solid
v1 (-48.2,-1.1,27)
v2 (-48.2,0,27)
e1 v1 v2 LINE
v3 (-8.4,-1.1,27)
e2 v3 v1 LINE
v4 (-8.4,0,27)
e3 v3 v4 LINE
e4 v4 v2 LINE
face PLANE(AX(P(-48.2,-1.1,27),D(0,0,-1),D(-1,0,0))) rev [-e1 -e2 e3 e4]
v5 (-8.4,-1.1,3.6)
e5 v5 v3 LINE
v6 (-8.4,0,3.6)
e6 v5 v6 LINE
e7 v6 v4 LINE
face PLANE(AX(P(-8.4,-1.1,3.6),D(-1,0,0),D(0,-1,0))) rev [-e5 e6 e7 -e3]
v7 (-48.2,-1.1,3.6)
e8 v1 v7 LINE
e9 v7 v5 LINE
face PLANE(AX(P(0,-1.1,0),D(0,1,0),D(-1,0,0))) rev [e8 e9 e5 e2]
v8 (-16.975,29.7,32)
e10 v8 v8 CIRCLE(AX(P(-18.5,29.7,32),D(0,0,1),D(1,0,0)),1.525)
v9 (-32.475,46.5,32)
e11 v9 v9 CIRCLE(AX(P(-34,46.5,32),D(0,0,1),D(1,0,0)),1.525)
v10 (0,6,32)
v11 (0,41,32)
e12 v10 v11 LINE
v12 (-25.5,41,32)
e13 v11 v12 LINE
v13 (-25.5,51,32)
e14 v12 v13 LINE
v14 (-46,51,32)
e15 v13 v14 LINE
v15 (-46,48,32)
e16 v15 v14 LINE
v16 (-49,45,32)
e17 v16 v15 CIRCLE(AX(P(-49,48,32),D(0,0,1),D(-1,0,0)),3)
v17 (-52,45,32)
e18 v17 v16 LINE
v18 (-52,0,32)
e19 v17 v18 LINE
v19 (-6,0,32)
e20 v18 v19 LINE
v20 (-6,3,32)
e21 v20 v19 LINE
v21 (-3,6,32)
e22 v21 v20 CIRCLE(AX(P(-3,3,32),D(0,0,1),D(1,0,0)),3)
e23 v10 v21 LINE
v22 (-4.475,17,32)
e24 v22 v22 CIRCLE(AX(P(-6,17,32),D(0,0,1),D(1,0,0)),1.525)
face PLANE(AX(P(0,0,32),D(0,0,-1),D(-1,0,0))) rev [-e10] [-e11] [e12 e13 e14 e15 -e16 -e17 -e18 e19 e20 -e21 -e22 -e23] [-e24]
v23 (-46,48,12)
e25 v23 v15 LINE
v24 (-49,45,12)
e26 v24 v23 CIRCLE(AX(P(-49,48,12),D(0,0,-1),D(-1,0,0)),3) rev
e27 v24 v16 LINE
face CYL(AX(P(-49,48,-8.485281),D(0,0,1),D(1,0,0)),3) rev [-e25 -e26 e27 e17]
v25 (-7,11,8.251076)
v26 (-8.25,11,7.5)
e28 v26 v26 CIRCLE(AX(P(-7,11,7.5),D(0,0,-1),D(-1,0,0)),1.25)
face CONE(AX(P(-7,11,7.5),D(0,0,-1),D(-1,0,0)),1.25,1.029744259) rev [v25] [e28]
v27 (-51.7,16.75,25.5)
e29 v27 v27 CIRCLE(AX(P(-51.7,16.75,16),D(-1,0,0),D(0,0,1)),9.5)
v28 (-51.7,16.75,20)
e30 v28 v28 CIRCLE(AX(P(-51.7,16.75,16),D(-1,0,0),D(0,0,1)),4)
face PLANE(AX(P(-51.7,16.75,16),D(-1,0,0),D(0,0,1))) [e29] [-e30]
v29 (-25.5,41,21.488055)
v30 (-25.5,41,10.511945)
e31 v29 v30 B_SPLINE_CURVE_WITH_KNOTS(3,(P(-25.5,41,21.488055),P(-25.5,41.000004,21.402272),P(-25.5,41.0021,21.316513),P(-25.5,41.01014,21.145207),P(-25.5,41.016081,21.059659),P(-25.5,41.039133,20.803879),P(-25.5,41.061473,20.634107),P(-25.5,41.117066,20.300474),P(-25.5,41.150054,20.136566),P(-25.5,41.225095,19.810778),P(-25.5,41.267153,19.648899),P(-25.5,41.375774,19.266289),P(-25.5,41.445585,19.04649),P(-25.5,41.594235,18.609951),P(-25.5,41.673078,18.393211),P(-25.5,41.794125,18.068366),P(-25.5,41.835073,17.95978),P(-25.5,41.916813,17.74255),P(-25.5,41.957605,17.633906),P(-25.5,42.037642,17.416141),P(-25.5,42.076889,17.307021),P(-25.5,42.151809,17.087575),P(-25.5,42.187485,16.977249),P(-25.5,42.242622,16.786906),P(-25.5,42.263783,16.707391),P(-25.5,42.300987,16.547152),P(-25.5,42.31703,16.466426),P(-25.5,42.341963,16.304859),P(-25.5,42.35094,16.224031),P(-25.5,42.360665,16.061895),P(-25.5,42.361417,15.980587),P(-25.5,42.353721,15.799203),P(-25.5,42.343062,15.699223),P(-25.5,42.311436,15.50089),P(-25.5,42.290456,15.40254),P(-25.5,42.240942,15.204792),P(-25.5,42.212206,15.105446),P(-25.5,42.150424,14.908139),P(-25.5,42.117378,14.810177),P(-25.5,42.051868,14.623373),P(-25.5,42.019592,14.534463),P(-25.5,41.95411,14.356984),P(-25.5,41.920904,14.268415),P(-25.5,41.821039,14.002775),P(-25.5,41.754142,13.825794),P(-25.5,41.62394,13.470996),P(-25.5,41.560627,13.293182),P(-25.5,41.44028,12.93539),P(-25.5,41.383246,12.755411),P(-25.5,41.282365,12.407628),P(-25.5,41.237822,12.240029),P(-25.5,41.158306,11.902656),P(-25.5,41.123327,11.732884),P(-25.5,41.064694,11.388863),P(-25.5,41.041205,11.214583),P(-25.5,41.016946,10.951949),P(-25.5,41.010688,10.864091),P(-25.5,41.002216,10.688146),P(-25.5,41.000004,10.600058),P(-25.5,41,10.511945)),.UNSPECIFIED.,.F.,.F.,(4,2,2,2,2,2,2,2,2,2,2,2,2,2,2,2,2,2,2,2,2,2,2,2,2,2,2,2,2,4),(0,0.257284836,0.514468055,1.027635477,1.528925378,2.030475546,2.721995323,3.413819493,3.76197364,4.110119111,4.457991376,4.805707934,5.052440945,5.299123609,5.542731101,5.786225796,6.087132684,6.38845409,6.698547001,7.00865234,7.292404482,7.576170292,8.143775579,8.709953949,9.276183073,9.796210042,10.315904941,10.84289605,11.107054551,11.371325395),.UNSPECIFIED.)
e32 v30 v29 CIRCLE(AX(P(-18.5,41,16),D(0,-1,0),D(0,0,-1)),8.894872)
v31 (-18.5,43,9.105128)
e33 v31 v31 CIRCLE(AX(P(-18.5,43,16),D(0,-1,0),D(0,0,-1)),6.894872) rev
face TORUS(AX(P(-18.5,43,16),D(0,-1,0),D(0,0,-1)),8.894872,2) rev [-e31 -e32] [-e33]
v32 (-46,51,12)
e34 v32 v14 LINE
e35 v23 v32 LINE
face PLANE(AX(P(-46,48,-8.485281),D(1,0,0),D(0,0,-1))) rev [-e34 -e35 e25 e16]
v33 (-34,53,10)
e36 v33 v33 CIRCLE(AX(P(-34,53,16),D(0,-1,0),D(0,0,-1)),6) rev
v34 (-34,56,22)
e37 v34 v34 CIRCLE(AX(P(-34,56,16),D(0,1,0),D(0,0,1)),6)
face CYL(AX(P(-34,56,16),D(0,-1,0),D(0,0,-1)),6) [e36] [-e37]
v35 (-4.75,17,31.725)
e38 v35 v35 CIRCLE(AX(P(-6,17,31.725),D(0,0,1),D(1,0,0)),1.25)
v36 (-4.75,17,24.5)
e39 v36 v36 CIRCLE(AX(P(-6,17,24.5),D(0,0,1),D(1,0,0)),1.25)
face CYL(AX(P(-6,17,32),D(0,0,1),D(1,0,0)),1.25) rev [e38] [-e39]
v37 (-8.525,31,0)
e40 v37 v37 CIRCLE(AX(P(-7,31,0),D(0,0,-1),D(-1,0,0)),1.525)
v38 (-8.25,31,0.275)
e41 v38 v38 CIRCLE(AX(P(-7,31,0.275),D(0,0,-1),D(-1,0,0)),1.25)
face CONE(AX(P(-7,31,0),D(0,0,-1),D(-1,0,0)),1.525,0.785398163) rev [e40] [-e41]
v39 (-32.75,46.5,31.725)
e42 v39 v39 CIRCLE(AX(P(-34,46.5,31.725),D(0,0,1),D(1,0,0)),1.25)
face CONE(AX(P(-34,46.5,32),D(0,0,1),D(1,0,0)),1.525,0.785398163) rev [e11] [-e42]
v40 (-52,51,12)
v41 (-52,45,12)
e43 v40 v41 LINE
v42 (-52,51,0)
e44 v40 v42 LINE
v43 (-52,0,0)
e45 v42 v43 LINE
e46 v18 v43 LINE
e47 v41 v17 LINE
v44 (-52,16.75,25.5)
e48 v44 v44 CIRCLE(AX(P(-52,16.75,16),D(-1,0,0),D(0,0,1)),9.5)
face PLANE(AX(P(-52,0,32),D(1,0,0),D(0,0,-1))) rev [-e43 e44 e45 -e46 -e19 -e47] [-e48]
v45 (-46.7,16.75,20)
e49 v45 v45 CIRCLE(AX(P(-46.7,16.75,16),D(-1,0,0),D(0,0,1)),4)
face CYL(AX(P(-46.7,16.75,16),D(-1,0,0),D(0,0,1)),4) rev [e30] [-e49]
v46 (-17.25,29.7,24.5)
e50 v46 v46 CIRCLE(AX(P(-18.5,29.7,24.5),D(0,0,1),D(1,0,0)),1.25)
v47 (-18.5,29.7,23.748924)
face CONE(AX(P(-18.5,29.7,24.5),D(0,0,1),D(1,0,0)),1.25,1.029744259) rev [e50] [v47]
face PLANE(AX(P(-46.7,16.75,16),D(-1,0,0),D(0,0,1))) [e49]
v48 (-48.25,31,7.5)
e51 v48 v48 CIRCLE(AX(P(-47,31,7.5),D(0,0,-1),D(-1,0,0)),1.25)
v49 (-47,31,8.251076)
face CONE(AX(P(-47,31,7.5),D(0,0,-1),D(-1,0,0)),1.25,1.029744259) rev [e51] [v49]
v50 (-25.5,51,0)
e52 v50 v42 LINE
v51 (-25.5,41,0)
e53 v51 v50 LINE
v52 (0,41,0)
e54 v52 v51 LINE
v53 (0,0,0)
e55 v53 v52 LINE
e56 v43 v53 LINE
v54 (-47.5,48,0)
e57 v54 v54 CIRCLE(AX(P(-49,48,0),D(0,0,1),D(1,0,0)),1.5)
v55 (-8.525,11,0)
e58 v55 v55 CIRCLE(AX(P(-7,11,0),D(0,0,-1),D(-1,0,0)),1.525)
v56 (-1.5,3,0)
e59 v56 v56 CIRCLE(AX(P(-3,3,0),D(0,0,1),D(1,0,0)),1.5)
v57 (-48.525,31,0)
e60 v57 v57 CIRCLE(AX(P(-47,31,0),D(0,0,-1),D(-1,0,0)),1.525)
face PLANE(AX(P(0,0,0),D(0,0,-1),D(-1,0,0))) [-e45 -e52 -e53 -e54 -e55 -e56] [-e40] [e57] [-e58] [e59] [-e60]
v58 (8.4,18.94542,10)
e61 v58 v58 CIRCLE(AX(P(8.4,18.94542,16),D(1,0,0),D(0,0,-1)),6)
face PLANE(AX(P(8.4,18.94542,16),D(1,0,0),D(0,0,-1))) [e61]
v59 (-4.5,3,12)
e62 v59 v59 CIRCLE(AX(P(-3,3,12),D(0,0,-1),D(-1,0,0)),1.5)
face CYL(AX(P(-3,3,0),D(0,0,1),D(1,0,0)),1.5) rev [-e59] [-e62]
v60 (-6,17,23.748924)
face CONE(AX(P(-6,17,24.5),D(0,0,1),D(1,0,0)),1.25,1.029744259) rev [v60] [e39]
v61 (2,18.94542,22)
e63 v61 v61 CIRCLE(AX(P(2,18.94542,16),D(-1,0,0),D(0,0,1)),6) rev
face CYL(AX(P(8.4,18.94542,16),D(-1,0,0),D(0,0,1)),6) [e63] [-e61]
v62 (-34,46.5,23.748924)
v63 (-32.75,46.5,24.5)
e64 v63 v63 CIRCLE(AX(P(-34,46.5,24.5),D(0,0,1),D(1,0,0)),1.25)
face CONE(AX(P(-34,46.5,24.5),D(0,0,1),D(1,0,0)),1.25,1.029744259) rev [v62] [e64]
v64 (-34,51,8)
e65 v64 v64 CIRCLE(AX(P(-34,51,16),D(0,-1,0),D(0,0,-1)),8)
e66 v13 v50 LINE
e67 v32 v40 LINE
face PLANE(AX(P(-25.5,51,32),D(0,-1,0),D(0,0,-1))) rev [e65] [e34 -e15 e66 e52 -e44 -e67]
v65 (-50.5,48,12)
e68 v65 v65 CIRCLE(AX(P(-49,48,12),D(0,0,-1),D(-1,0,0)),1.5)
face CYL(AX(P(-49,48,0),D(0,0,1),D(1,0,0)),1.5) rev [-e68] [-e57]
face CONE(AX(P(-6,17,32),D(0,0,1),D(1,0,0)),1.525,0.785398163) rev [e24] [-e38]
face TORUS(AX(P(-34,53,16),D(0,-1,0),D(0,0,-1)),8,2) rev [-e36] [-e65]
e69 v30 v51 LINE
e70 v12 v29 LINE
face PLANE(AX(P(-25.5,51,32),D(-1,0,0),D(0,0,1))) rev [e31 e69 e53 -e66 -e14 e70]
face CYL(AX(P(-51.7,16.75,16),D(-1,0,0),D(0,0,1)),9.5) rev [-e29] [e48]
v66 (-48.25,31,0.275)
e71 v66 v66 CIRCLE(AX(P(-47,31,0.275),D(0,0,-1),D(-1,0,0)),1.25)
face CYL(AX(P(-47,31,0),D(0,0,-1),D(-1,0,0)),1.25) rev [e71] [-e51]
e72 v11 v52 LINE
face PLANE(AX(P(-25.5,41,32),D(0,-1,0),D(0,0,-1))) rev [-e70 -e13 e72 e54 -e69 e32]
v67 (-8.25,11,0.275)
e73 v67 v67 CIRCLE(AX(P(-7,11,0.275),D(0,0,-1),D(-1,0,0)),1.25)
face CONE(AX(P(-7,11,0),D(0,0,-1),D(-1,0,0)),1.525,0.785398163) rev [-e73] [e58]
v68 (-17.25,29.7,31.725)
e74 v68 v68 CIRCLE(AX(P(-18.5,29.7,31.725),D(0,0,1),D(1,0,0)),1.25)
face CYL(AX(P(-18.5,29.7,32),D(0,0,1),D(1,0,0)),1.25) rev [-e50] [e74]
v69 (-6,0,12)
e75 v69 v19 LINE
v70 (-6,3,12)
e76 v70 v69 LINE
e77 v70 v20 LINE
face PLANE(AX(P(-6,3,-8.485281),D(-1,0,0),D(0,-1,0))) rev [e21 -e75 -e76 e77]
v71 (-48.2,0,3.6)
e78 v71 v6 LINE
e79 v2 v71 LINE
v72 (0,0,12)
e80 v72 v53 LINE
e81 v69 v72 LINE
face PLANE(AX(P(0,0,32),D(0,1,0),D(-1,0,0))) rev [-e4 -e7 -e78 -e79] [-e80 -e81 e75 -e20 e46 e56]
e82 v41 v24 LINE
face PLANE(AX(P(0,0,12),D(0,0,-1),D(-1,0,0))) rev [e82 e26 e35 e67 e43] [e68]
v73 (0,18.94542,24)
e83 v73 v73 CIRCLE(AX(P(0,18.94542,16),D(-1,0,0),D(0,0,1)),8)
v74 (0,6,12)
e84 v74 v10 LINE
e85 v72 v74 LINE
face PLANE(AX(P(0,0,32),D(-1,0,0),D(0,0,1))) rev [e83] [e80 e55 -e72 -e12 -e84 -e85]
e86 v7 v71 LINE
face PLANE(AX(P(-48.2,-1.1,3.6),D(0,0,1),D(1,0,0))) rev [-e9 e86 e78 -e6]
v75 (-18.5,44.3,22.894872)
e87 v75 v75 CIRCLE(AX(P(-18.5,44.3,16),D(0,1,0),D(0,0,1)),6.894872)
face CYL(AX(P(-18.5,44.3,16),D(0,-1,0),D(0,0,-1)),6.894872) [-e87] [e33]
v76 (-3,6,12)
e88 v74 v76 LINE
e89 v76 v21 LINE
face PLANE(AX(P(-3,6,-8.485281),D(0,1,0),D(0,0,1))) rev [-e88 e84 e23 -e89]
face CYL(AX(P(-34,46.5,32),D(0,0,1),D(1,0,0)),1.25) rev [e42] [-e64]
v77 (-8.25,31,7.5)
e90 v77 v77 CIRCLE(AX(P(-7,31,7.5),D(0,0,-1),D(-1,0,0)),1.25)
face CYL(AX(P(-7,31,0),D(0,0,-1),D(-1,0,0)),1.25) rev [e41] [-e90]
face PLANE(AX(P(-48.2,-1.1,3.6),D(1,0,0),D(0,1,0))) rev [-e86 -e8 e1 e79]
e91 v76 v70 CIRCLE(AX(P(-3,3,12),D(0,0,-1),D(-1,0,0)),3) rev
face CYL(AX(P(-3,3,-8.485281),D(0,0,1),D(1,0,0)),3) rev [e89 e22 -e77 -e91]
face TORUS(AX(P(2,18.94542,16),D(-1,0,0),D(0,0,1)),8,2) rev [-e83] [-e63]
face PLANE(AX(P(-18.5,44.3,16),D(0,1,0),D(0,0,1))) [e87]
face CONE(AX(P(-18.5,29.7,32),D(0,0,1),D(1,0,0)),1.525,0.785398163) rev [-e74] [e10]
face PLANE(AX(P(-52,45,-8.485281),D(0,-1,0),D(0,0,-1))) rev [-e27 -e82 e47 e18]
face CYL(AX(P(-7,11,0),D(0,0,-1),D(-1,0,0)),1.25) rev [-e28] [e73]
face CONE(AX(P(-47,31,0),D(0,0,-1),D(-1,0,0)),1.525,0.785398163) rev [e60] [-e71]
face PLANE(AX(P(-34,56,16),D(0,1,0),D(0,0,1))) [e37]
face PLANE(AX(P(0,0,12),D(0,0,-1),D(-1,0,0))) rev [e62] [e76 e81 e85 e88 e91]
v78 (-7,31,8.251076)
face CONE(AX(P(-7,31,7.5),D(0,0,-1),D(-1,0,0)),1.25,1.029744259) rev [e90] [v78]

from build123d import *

# Parameters (mm, degrees)
BOSS_EXTRUDE1_DEPTH         = 32
SKETCH2_R                   = 9.5
CUT_EXTRUDE1_DEPTH          = 0.3
SKETCH3_R                   = 4
CUT_EXTRUDE2_DEPTH          = 5
CUT_EXTRUDE3_DEPTH          = 20
CUT_EXTRUDE4_DEPTH          = 76.531450403
CUT_EXTRUDE4_DEPTH_BACK     = 76.531450403
SKETCH5_R                   = 1.5
M3_TAPPED_HOLE1_D           = 2.5
M3_TAPPED_HOLE1_DEPTH       = 7.5
M3_TAPPED_HOLE1_CSINK_D     = 3.05
M3_TAPPED_HOLE1_CSINK_ANGLE = 90
M3_TAPPED_HOLE1_TIP         = 0.751075774
SKETCH9_W                   = 39.8
SKETCH9_H                   = 23.4
BOSS_EXTRUDE2_DEPTH         = 1.1
SKETCH10_R                  = 6
BOSS_EXTRUDE3_DEPTH         = 8.4
SKETCH11_R                  = 6
BOSS_EXTRUDE4_DEPTH         = 5
SKETCH12_R                  = 6.894871922
BOSS_EXTRUDE5_DEPTH         = 3.3
FILLET1_R                   = 2
M3_TAPPED_HOLE2_D           = 2.5
M3_TAPPED_HOLE2_DEPTH       = 7.5
M3_TAPPED_HOLE2_CSINK_D     = 3.05
M3_TAPPED_HOLE2_CSINK_ANGLE = 90
M3_TAPPED_HOLE2_TIP         = 0.751075774


with BuildPart() as part:
    # Sketch1 → Boss-Extrude1 (new body)
    with BuildSketch(Plane.XY):
        Polygon((-25.5, 51), (-25.5, 41), (0, 41), (0, 0), (-52, 0), (-52, 51), align=None)
    extrude(amount=BOSS_EXTRUDE1_DEPTH)

    # Sketch2 → Cut-Extrude1 (cut)
    with BuildSketch(Plane.ZY.offset(52)):
        with Locations((16, 16.75)):
            Circle(SKETCH2_R)
    extrude(amount=-CUT_EXTRUDE1_DEPTH, mode=Mode.SUBTRACT)

    # Sketch3 → Cut-Extrude2 (cut)
    with BuildSketch(Plane.ZY.offset(51.7)):
        with Locations((16, 16.75)):
            Circle(SKETCH3_R)
    extrude(amount=-CUT_EXTRUDE2_DEPTH, mode=Mode.SUBTRACT)

    # Sketch4 → Cut-Extrude3 (cut)
    with BuildSketch(Plane.XY.offset(32)):
        with BuildLine():
            Line((-6, 3), (-6, 0))
            Line((-6, 0), (0, 0))
            Line((0, 0), (0, 6))
            Line((0, 6), (-3, 6))
            ThreePointArc((-3, 6), (-5.121320344, 5.121320344), (-6, 3))
        make_face()
        with BuildLine():
            Line((-52, 45), (-49, 45))
            ThreePointArc((-49, 45), (-46.878679656, 45.878679656), (-46, 48))
            Line((-46, 48), (-46, 51))
            Line((-46, 51), (-52, 51))
            Line((-52, 51), (-52, 45))
        make_face()
    extrude(amount=-CUT_EXTRUDE3_DEPTH, mode=Mode.SUBTRACT)

    # Sketch5 → Cut-Extrude4 (cut, two sides: drawn at the far end of the back side and taken through both)
    with BuildSketch(Plane.XY.offset(12).offset(-CUT_EXTRUDE4_DEPTH_BACK)):
        with Locations((-3, 3)):
            Circle(SKETCH5_R)
        with Locations((-49, 48)):
            Circle(SKETCH5_R)
    extrude(amount=CUT_EXTRUDE4_DEPTH + CUT_EXTRUDE4_DEPTH_BACK, mode=Mode.SUBTRACT)

    # M3 Tapped Hole1
    with Locations(Plane(origin=(0, 0, 0), x_dir=(-1, 0, 0), z_dir=(0, 0, -1))):
        with Locations((7, 31), (7, 11), (47, 31)):
            CounterSinkHole(M3_TAPPED_HOLE1_D / 2, M3_TAPPED_HOLE1_CSINK_D / 2, depth=M3_TAPPED_HOLE1_DEPTH, counter_sink_angle=M3_TAPPED_HOLE1_CSINK_ANGLE)
            with Locations((0, 0, -(M3_TAPPED_HOLE1_DEPTH + M3_TAPPED_HOLE1_TIP / 2))):  # 118° drill point
                Cone(0, M3_TAPPED_HOLE1_D / 2, M3_TAPPED_HOLE1_TIP, mode=Mode.SUBTRACT)

    # Sketch9 → Boss-Extrude2 (add)
    with BuildSketch(Plane.XZ):
        with Locations((-28.3, 15.3)):
            Rectangle(SKETCH9_W, SKETCH9_H)
    extrude(amount=BOSS_EXTRUDE2_DEPTH)

    # Sketch10 → Boss-Extrude3 (add)
    with BuildSketch(Plane(origin=(0, 0, 0), x_dir=(0, 0, -1), z_dir=(1, 0, 0))):
        with Locations(Location((-16, 18.94541958, 0), (0, 0, 180))):
            Circle(SKETCH10_R)
    extrude(amount=BOSS_EXTRUDE3_DEPTH)

    # Sketch11 → Boss-Extrude4 (add)
    with BuildSketch(Plane(origin=(0, 51, 0), x_dir=(1, 0, 0), z_dir=(0, 1, 0))):
        with Locations(Location((-34, -16, 0), (0, 0, 90))):
            Circle(SKETCH11_R)
    extrude(amount=BOSS_EXTRUDE4_DEPTH)

    # Sketch12 → Boss-Extrude5 (add)
    with BuildSketch(Plane(origin=(0, 41, 0), x_dir=(1, 0, 0), z_dir=(0, 1, 0))):
        with Locations(Location((-18.5, -16, 0), (0, 0, 90))):
            Circle(SKETCH12_R)
    extrude(amount=BOSS_EXTRUDE5_DEPTH)

    # Fillet1
    # the kernel refuses this fillet: 2 mm, written as the material it adds along each edge
    with BuildSketch(Plane(origin=(-34, 51, 16), x_dir=(0, 0, -1), z_dir=(1, 0, 0))) as fillet1_piece_1:
        with BuildLine():
            CenterArc((6 + FILLET1_R, FILLET1_R), FILLET1_R, 180, 90)
            Line((6, FILLET1_R), (6, 0))
            Line((6, 0), (6 + FILLET1_R, 0))
        make_face()
    revolve(axis=Axis((-34, 51, 16), (0, 1, 0)))
    with BuildSketch(Plane(origin=(-18.5, 41, 16), x_dir=(0, 0, -1), z_dir=(1, 0, 0))) as fillet1_piece_2:
        with BuildLine():
            CenterArc((6.894871922 + FILLET1_R, FILLET1_R), FILLET1_R, 180, 90)
            Line((6.894871922, FILLET1_R), (6.894871922, 0))
            Line((6.894871922, 0), (6.894871922 + FILLET1_R, 0))
        make_face()
    revolve(axis=Axis((-18.5, 41, 16), (0, 1, 0)))
    with BuildSketch(Plane(origin=(0, 18.94541958, 16), x_dir=(0, 0, 1), z_dir=(0, 1, 0))) as fillet1_piece_3:
        with BuildLine():
            CenterArc((6 + FILLET1_R, FILLET1_R), FILLET1_R, 180, 90)
            Line((6, FILLET1_R), (6, 0))
            Line((6, 0), (6 + FILLET1_R, 0))
        make_face()
    revolve(axis=Axis((0, 18.94541958, 16), (1, 0, 0)))

    # M3 Tapped Hole2
    with Locations(Plane.XY.offset(32)):
        with Locations((-34, 46.5), (-18.5, 29.7), (-6, 17)):
            CounterSinkHole(M3_TAPPED_HOLE2_D / 2, M3_TAPPED_HOLE2_CSINK_D / 2, depth=M3_TAPPED_HOLE2_DEPTH, counter_sink_angle=M3_TAPPED_HOLE2_CSINK_ANGLE)
            with Locations((0, 0, -(M3_TAPPED_HOLE2_DEPTH + M3_TAPPED_HOLE2_TIP / 2))):  # 118° drill point
                Cone(0, M3_TAPPED_HOLE2_D / 2, M3_TAPPED_HOLE2_TIP, mode=Mode.SUBTRACT)


solid = part.part
